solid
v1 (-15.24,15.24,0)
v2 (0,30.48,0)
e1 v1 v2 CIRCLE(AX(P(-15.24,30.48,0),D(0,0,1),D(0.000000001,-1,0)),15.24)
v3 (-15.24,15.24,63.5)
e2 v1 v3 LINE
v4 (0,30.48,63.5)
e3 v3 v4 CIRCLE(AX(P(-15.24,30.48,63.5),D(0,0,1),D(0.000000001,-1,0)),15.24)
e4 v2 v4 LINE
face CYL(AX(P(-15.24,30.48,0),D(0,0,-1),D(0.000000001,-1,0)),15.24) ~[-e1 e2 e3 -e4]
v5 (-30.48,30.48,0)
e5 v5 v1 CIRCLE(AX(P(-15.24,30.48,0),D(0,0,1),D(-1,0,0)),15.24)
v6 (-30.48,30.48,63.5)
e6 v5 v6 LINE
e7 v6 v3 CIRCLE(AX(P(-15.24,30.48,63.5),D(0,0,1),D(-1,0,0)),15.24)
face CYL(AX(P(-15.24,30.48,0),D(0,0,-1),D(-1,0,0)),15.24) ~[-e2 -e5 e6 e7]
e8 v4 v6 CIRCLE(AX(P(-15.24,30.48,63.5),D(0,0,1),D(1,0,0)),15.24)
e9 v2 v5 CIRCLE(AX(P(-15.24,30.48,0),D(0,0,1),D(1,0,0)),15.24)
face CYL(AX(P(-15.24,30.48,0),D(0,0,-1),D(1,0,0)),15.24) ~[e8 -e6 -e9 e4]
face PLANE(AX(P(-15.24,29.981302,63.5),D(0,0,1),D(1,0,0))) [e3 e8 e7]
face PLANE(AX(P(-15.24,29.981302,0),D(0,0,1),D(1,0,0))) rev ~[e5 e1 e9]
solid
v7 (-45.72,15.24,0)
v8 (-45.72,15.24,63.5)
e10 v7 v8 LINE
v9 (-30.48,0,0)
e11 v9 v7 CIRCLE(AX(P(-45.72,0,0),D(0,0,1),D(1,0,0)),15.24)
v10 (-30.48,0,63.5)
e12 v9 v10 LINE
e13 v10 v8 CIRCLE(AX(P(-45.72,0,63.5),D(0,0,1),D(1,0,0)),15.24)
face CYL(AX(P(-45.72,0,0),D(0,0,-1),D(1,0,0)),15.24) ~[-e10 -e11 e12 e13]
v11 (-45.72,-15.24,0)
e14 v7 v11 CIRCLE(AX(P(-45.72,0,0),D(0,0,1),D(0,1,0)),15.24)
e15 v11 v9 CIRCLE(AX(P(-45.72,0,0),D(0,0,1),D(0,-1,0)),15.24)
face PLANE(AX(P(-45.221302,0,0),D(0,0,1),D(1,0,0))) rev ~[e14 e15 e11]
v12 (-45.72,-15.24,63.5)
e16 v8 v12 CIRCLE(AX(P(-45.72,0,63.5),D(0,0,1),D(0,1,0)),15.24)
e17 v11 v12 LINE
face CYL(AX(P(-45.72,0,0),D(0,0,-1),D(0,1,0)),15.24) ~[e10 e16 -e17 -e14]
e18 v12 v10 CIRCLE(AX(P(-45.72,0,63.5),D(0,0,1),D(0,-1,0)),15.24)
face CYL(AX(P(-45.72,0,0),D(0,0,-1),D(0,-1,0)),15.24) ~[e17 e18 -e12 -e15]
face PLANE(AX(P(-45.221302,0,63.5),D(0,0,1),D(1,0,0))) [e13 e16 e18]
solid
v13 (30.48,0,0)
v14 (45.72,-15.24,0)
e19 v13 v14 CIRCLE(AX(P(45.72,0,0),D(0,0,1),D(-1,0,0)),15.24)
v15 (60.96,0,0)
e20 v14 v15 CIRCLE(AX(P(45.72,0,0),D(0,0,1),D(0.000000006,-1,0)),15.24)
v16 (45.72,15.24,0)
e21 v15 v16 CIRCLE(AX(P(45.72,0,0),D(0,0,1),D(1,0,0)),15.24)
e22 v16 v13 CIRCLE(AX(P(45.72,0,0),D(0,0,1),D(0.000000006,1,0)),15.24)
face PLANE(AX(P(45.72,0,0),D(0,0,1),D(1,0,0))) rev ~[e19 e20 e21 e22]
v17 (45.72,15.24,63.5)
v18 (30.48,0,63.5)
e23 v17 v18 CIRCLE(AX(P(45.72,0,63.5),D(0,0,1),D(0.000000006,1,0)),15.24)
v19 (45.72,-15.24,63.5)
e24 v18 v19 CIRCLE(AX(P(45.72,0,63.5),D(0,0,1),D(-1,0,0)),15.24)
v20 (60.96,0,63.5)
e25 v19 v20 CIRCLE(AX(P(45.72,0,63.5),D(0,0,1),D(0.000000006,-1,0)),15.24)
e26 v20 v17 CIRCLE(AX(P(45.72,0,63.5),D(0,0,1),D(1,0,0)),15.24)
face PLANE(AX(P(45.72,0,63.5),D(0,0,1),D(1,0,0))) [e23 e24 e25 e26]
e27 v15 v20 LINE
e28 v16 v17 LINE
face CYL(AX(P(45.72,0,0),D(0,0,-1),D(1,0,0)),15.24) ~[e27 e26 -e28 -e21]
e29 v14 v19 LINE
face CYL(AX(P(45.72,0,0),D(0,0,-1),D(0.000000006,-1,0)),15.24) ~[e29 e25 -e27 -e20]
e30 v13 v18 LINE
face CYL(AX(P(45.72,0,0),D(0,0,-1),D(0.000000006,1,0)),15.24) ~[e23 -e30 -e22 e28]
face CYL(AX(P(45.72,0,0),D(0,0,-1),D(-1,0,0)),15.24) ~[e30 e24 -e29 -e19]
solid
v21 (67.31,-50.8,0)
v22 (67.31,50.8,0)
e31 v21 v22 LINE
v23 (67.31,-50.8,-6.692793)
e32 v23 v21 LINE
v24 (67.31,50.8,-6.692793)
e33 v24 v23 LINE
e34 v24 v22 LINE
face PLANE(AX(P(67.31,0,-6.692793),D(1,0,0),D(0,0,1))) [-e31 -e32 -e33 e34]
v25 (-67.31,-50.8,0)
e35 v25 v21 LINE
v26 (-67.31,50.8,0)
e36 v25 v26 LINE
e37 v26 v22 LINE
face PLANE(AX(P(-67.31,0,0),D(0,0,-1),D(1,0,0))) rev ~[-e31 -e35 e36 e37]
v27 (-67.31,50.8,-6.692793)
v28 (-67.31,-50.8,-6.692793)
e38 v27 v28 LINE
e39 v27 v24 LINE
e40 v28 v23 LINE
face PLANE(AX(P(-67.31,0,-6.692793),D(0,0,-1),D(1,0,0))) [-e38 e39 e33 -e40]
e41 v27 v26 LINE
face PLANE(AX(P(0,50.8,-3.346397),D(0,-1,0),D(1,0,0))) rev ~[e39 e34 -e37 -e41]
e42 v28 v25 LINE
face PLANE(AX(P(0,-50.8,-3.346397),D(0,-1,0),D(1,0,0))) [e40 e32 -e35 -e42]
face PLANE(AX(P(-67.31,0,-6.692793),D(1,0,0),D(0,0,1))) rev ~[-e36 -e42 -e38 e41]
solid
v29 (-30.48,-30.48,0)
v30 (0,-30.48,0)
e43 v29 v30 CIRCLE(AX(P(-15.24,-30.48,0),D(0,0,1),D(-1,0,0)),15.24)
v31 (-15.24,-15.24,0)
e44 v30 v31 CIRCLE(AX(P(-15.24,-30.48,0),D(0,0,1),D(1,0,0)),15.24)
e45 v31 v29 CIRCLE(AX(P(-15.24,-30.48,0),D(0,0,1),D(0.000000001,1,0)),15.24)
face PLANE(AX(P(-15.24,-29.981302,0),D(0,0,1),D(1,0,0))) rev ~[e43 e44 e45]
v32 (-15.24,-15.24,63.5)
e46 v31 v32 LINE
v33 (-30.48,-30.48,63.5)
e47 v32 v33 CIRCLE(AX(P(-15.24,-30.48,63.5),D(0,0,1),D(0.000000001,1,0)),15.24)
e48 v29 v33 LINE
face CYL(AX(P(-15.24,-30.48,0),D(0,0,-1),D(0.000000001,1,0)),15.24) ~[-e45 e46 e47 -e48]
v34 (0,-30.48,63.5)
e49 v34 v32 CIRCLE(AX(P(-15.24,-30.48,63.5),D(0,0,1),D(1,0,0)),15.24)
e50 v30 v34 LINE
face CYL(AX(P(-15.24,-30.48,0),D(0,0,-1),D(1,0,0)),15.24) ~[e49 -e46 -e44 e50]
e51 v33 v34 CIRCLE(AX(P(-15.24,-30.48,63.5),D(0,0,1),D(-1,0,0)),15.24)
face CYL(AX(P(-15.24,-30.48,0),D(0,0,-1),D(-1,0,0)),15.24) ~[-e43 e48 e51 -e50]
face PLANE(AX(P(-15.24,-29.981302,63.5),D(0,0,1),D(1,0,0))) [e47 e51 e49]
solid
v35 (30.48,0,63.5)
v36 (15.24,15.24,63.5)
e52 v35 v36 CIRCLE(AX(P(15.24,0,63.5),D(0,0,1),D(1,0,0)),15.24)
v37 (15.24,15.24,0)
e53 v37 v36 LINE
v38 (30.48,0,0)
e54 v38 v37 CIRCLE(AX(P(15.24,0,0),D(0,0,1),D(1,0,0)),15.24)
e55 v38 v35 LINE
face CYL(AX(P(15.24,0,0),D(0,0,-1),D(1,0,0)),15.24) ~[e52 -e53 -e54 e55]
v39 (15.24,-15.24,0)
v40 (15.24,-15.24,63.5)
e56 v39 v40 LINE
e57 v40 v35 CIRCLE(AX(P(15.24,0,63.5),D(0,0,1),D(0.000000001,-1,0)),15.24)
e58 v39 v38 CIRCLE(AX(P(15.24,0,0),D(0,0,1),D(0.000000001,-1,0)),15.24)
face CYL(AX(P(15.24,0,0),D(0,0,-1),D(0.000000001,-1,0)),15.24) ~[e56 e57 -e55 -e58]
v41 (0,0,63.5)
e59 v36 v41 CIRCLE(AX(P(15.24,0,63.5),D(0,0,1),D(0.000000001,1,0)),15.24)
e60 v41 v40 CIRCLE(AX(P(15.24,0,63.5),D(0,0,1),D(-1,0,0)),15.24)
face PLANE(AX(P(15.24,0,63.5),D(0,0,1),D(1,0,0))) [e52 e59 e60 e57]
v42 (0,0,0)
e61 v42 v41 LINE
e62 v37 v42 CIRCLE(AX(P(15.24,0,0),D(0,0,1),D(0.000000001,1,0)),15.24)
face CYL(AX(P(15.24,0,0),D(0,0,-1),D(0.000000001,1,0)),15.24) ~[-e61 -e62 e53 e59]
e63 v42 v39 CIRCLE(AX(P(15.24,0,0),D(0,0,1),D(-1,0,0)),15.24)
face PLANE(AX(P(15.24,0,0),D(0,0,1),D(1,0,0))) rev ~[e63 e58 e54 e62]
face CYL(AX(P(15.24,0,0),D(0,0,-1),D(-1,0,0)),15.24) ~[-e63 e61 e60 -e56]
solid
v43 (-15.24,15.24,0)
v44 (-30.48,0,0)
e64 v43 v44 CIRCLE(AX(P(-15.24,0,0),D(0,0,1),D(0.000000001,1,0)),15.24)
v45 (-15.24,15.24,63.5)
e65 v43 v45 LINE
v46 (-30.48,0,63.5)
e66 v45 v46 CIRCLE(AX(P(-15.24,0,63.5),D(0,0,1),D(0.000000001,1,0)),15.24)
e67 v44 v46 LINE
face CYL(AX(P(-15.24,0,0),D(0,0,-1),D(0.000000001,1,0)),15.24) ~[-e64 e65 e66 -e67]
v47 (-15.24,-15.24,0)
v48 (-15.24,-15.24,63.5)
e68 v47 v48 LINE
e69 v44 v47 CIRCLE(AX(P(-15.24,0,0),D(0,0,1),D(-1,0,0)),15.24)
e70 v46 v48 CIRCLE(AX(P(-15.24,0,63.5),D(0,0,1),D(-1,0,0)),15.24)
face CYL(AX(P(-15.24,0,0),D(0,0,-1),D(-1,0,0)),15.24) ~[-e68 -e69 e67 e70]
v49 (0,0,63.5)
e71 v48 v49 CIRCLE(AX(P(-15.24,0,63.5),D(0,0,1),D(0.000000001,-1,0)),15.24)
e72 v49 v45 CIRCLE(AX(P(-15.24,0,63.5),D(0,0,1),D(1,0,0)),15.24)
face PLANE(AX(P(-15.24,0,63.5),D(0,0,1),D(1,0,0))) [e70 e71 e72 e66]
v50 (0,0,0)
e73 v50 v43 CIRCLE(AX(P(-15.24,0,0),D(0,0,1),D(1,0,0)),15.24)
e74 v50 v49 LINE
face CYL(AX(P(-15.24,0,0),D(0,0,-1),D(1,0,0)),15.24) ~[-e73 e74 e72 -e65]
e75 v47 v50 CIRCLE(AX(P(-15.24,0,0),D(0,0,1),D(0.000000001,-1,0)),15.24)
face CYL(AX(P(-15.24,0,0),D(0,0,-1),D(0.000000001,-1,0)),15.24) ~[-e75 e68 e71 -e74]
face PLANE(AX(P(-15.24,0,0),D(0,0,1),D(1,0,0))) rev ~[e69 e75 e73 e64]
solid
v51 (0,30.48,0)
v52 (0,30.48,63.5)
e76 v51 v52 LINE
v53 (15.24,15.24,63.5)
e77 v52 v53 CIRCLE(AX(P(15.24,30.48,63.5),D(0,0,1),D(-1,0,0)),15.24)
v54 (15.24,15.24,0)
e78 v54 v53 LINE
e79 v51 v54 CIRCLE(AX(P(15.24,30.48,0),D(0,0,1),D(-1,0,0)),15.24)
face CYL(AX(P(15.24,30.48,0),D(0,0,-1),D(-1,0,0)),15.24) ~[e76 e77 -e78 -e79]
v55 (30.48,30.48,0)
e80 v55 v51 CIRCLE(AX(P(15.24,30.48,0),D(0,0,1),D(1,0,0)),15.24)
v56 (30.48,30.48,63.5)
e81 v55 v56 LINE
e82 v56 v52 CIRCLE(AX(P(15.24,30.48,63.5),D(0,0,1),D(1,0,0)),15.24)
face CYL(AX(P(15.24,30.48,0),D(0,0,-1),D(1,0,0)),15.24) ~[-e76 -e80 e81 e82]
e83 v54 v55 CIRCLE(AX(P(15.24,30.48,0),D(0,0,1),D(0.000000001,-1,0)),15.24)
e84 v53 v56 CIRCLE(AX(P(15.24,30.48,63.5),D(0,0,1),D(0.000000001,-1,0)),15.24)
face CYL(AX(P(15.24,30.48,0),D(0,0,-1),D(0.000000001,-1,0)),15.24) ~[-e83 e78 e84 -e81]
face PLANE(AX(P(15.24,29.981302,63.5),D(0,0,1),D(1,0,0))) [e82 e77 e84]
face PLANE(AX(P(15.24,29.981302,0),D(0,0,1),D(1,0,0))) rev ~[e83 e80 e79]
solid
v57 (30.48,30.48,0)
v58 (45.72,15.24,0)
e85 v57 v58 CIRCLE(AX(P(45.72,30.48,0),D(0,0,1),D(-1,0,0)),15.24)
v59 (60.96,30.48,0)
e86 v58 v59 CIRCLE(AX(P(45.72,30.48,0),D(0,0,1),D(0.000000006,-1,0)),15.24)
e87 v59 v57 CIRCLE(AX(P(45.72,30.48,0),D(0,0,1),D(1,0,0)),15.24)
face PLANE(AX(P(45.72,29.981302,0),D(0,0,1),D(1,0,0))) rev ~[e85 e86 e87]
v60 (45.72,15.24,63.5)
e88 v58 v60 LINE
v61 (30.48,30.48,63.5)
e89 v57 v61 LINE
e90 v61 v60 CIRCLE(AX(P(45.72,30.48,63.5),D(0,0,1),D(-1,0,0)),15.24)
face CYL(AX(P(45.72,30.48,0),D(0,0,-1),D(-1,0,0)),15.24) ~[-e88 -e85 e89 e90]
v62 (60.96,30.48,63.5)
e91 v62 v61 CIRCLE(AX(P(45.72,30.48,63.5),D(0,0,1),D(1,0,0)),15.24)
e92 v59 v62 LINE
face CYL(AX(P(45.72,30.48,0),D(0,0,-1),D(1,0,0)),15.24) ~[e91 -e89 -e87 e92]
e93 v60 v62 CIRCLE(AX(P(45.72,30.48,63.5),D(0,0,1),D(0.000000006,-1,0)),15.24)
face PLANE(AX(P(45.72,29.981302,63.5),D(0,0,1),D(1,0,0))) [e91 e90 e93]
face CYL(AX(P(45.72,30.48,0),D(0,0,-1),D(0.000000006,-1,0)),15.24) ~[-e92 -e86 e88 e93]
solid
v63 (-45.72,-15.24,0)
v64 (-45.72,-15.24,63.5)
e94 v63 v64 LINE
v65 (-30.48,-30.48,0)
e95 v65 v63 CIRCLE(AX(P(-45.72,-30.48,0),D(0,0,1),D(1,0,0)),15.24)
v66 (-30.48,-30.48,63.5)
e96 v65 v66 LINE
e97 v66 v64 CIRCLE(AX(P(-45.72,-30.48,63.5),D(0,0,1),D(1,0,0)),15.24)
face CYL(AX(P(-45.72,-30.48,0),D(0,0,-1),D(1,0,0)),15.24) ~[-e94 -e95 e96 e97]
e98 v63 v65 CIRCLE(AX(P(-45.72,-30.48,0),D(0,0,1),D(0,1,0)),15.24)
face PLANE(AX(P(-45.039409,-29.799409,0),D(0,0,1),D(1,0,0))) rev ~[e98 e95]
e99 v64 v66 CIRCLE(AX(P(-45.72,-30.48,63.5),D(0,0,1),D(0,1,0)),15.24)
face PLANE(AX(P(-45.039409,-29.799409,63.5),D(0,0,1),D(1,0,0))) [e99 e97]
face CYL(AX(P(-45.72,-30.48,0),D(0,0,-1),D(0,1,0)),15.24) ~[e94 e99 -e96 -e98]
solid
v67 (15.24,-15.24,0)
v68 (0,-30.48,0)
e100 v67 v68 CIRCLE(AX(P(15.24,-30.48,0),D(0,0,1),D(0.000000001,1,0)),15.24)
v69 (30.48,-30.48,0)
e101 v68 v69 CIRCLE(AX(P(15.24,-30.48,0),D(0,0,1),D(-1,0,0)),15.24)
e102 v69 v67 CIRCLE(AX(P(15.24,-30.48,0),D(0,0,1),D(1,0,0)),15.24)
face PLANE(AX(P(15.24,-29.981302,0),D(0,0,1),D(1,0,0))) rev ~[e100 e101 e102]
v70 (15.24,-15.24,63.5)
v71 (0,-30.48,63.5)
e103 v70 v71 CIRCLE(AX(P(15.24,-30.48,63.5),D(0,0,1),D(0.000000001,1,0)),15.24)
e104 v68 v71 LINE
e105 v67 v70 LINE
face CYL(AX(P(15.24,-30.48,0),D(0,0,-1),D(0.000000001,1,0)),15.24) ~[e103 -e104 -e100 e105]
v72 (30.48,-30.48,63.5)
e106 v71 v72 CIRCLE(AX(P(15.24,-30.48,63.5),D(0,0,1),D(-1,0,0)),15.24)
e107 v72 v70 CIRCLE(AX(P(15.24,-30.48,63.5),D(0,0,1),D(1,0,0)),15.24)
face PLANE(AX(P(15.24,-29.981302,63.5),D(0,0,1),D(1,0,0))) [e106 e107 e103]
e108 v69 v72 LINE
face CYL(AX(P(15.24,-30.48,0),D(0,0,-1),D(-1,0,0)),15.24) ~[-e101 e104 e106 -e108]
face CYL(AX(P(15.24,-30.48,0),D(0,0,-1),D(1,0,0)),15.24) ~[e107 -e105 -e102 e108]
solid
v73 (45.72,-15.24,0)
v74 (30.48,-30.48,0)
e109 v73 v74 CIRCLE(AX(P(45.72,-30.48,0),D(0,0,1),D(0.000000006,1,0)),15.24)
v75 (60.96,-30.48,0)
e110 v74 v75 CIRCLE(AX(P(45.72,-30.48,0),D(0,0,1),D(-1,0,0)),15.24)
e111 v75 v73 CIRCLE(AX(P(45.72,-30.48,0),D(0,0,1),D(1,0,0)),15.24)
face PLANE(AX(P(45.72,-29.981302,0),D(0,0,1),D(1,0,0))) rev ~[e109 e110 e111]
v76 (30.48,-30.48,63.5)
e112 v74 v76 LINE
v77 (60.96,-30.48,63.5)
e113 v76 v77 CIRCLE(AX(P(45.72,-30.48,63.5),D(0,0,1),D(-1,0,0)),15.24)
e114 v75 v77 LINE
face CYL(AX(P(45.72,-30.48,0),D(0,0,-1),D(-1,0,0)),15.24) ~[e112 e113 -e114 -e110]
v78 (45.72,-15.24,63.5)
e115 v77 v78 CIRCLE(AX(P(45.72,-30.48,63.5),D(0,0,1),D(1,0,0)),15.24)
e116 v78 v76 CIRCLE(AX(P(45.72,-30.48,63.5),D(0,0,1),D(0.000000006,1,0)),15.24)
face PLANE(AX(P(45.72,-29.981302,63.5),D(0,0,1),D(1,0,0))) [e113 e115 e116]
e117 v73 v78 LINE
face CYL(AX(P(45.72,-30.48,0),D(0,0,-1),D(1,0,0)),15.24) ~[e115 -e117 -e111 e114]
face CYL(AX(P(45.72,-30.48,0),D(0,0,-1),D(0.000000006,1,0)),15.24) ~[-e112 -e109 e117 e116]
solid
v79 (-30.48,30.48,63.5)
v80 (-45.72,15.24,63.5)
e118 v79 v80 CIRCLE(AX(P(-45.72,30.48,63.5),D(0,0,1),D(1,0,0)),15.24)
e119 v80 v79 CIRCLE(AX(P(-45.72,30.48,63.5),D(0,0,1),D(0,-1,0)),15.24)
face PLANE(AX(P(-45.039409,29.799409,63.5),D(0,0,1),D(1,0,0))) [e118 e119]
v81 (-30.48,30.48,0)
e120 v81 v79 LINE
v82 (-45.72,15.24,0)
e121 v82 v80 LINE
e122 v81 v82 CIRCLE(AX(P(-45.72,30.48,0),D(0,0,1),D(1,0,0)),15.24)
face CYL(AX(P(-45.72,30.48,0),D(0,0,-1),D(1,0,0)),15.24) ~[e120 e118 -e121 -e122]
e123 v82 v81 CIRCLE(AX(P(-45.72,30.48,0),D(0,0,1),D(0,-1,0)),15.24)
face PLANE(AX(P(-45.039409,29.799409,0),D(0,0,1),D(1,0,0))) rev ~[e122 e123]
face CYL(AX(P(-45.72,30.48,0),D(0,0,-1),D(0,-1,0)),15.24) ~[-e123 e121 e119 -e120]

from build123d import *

# Parameters (mm, degrees)
F1_DEPTH = 63.5
F2_W     = 134.62
F2_H     = 6.6927933697
F3_DEPTH = 50.8


# Not quite as in the source:
# - a feature names something its author has since deleted; it is built from what else it names


with BuildPart() as f1:
    # F0 (on Top) → F1 (new body)
    with BuildSketch(Plane.XY):
        with BuildLine():
            ThreePointArc((-45.72, -15.24), (-56.4963073453, -41.2563073453), (-30.48, -30.48))
            ThreePointArc((-30.48, -30.48), (-34.9436926547, -19.7036926547), (-45.72, -15.24))
        make_face()
    extrude(amount=F1_DEPTH)


with BuildPart() as f1b:
    # F0 (on Top) → F1, piece 2 (new body)
    with BuildSketch(Plane.XY):
        with BuildLine():
            ThreePointArc((-15.2399999801, -15.24), (-26.0163073382, -19.7036926477), (-30.48, -30.48))
            ThreePointArc((-30.48, -30.48), (-15.24, -45.72), (0, -30.48))
            ThreePointArc((0, -30.48), (-4.4636926477, -19.7036926618), (-15.2399999801, -15.24))
        make_face()
    extrude(amount=F1_DEPTH)


with BuildPart() as f1c:
    # F0 (on Top) → F1, piece 3 (new body)
    with BuildSketch(Plane.XY):
        with BuildLine():
            ThreePointArc((-45.72, 15.24), (-60.96, 0), (-45.72, -15.24))
            ThreePointArc((-45.72, -15.24), (-34.9436926547, -10.7763073453), (-30.48, 0))
            ThreePointArc((-30.48, 0), (-34.9436926547, 10.7763073453), (-45.72, 15.24))
        make_face()
    extrude(amount=F1_DEPTH)


with BuildPart() as f1d:
    # F0 (on Top) → F1, piece 4 (new body)
    with BuildSketch(Plane.XY):
        with BuildLine():
            ThreePointArc((15.2400000199, -15.24), (4.4636926618, -19.7036926477), (0, -30.48))
            ThreePointArc((0, -30.48), (15.24, -45.72), (30.48, -30.48))
            ThreePointArc((30.48, -30.48), (26.0163073523, -19.7036926618), (15.2400000199, -15.24))
        make_face()
    extrude(amount=F1_DEPTH)


with BuildPart() as f1e:
    # F0 (on Top) → F1, piece 5 (new body)
    with BuildSketch(Plane.XY):
        with BuildLine():
            ThreePointArc((-30.48, 0), (-26.0163073382, -10.7763073523), (-15.2399999801, -15.24))
            ThreePointArc((-15.2399999801, -15.24), (-4.4636926477, -10.7763073382), (0, 0))
            ThreePointArc((0, 0), (-4.4636926477, 10.7763073382), (-15.2399999801, 15.24))
            ThreePointArc((-15.2399999801, 15.24), (-26.0163073382, 10.7763073523), (-30.48, 0))
        make_face()
    extrude(amount=F1_DEPTH)


with BuildPart() as f1f:
    # F0 (on Top) → F1, piece 6 (new body)
    with BuildSketch(Plane.XY):
        with BuildLine():
            ThreePointArc((-30.48, 30.48), (-56.4963073453, 41.2563073453), (-45.72, 15.24))
            ThreePointArc((-45.72, 15.24), (-34.9436926547, 19.7036926547), (-30.48, 30.48))
        make_face()
    extrude(amount=F1_DEPTH)


with BuildPart() as f1g:
    # F0 (on Top) → F1, piece 7 (new body)
    with BuildSketch(Plane.XY):
        with BuildLine():
            ThreePointArc((45.7200000919, -15.24), (34.9436926872, -19.7036926222), (30.48, -30.48))
            ThreePointArc((30.48, -30.48), (45.72, -45.72), (60.96, -30.48))
            ThreePointArc((60.96, -30.48), (56.4963073778, -19.7036926872), (45.7200000919, -15.24))
        make_face()
    extrude(amount=F1_DEPTH)


with BuildPart() as f1h:
    # F0 (on Top) → F1, piece 8 (new body)
    with BuildSketch(Plane.XY):
        with BuildLine():
            ThreePointArc((0, 0), (4.4636926618, -10.7763073523), (15.2400000199, -15.24))
            ThreePointArc((15.2400000199, -15.24), (26.0163073523, -10.7763073382), (30.48, 0))
            ThreePointArc((30.48, 0), (26.0163073523, 10.7763073382), (15.2400000199, 15.24))
            ThreePointArc((15.2400000199, 15.24), (4.4636926618, 10.7763073523), (0, 0))
        make_face()
    extrude(amount=F1_DEPTH)


with BuildPart() as f1i:
    # F0 (on Top) → F1, piece 9 (new body)
    with BuildSketch(Plane.XY):
        with BuildLine():
            ThreePointArc((0, 30.48), (-15.24, 45.72), (-30.48, 30.48))
            ThreePointArc((-30.48, 30.48), (-26.0163073382, 19.7036926477), (-15.2399999801, 15.24))
            ThreePointArc((-15.2399999801, 15.24), (-4.4636926477, 19.7036926618), (0, 30.48))
        make_face()
    extrude(amount=F1_DEPTH)


with BuildPart() as f1j:
    # F0 (on Top) → F1, piece 10 (new body)
    with BuildSketch(Plane.XY):
        with BuildLine():
            ThreePointArc((30.48, 0), (34.9436926872, -10.7763073778), (45.7200000919, -15.24))
            ThreePointArc((45.7200000919, -15.24), (56.4963073778, -10.7763073128), (60.96, 0))
            ThreePointArc((60.96, 0), (56.4963073778, 10.7763073128), (45.7200000919, 15.24))
            ThreePointArc((45.7200000919, 15.24), (34.9436926872, 10.7763073778), (30.48, 0))
        make_face()
    extrude(amount=F1_DEPTH)


with BuildPart() as f1k:
    # F0 (on Top) → F1, piece 11 (new body)
    with BuildSketch(Plane.XY):
        with BuildLine():
            ThreePointArc((0, 30.48), (4.4636926618, 19.7036926477), (15.2400000199, 15.24))
            ThreePointArc((15.2400000199, 15.24), (26.0163073523, 19.7036926618), (30.48, 30.48))
            ThreePointArc((30.48, 30.48), (15.24, 45.72), (0, 30.48))
        make_face()
    extrude(amount=F1_DEPTH)


with BuildPart() as f1l:
    # F0 (on Top) → F1, piece 12 (new body)
    with BuildSketch(Plane.XY):
        with BuildLine():
            ThreePointArc((30.48, 30.48), (34.9436926872, 19.7036926222), (45.7200000919, 15.24))
            ThreePointArc((45.7200000919, 15.24), (56.4963073778, 19.7036926872), (60.96, 30.48))
            ThreePointArc((60.96, 30.48), (45.72, 45.72), (30.48, 30.48))
        make_face()
    extrude(amount=F1_DEPTH)


with BuildPart() as f3:
    # F2 (on Front) → F3 (new body, symmetric)
    with BuildSketch(Plane.XZ):
        with Locations((0, -3.3463966849)):
            Rectangle(F2_W, F2_H)
    extrude(amount=F3_DEPTH, both=True)


solid = Compound([f1.part, f1b.part, f1c.part, f1d.part, f1e.part, f1f.part, f1g.part, f1h.part, f1i.part, f1j.part, f1k.part, f1l.part, f3.part])
